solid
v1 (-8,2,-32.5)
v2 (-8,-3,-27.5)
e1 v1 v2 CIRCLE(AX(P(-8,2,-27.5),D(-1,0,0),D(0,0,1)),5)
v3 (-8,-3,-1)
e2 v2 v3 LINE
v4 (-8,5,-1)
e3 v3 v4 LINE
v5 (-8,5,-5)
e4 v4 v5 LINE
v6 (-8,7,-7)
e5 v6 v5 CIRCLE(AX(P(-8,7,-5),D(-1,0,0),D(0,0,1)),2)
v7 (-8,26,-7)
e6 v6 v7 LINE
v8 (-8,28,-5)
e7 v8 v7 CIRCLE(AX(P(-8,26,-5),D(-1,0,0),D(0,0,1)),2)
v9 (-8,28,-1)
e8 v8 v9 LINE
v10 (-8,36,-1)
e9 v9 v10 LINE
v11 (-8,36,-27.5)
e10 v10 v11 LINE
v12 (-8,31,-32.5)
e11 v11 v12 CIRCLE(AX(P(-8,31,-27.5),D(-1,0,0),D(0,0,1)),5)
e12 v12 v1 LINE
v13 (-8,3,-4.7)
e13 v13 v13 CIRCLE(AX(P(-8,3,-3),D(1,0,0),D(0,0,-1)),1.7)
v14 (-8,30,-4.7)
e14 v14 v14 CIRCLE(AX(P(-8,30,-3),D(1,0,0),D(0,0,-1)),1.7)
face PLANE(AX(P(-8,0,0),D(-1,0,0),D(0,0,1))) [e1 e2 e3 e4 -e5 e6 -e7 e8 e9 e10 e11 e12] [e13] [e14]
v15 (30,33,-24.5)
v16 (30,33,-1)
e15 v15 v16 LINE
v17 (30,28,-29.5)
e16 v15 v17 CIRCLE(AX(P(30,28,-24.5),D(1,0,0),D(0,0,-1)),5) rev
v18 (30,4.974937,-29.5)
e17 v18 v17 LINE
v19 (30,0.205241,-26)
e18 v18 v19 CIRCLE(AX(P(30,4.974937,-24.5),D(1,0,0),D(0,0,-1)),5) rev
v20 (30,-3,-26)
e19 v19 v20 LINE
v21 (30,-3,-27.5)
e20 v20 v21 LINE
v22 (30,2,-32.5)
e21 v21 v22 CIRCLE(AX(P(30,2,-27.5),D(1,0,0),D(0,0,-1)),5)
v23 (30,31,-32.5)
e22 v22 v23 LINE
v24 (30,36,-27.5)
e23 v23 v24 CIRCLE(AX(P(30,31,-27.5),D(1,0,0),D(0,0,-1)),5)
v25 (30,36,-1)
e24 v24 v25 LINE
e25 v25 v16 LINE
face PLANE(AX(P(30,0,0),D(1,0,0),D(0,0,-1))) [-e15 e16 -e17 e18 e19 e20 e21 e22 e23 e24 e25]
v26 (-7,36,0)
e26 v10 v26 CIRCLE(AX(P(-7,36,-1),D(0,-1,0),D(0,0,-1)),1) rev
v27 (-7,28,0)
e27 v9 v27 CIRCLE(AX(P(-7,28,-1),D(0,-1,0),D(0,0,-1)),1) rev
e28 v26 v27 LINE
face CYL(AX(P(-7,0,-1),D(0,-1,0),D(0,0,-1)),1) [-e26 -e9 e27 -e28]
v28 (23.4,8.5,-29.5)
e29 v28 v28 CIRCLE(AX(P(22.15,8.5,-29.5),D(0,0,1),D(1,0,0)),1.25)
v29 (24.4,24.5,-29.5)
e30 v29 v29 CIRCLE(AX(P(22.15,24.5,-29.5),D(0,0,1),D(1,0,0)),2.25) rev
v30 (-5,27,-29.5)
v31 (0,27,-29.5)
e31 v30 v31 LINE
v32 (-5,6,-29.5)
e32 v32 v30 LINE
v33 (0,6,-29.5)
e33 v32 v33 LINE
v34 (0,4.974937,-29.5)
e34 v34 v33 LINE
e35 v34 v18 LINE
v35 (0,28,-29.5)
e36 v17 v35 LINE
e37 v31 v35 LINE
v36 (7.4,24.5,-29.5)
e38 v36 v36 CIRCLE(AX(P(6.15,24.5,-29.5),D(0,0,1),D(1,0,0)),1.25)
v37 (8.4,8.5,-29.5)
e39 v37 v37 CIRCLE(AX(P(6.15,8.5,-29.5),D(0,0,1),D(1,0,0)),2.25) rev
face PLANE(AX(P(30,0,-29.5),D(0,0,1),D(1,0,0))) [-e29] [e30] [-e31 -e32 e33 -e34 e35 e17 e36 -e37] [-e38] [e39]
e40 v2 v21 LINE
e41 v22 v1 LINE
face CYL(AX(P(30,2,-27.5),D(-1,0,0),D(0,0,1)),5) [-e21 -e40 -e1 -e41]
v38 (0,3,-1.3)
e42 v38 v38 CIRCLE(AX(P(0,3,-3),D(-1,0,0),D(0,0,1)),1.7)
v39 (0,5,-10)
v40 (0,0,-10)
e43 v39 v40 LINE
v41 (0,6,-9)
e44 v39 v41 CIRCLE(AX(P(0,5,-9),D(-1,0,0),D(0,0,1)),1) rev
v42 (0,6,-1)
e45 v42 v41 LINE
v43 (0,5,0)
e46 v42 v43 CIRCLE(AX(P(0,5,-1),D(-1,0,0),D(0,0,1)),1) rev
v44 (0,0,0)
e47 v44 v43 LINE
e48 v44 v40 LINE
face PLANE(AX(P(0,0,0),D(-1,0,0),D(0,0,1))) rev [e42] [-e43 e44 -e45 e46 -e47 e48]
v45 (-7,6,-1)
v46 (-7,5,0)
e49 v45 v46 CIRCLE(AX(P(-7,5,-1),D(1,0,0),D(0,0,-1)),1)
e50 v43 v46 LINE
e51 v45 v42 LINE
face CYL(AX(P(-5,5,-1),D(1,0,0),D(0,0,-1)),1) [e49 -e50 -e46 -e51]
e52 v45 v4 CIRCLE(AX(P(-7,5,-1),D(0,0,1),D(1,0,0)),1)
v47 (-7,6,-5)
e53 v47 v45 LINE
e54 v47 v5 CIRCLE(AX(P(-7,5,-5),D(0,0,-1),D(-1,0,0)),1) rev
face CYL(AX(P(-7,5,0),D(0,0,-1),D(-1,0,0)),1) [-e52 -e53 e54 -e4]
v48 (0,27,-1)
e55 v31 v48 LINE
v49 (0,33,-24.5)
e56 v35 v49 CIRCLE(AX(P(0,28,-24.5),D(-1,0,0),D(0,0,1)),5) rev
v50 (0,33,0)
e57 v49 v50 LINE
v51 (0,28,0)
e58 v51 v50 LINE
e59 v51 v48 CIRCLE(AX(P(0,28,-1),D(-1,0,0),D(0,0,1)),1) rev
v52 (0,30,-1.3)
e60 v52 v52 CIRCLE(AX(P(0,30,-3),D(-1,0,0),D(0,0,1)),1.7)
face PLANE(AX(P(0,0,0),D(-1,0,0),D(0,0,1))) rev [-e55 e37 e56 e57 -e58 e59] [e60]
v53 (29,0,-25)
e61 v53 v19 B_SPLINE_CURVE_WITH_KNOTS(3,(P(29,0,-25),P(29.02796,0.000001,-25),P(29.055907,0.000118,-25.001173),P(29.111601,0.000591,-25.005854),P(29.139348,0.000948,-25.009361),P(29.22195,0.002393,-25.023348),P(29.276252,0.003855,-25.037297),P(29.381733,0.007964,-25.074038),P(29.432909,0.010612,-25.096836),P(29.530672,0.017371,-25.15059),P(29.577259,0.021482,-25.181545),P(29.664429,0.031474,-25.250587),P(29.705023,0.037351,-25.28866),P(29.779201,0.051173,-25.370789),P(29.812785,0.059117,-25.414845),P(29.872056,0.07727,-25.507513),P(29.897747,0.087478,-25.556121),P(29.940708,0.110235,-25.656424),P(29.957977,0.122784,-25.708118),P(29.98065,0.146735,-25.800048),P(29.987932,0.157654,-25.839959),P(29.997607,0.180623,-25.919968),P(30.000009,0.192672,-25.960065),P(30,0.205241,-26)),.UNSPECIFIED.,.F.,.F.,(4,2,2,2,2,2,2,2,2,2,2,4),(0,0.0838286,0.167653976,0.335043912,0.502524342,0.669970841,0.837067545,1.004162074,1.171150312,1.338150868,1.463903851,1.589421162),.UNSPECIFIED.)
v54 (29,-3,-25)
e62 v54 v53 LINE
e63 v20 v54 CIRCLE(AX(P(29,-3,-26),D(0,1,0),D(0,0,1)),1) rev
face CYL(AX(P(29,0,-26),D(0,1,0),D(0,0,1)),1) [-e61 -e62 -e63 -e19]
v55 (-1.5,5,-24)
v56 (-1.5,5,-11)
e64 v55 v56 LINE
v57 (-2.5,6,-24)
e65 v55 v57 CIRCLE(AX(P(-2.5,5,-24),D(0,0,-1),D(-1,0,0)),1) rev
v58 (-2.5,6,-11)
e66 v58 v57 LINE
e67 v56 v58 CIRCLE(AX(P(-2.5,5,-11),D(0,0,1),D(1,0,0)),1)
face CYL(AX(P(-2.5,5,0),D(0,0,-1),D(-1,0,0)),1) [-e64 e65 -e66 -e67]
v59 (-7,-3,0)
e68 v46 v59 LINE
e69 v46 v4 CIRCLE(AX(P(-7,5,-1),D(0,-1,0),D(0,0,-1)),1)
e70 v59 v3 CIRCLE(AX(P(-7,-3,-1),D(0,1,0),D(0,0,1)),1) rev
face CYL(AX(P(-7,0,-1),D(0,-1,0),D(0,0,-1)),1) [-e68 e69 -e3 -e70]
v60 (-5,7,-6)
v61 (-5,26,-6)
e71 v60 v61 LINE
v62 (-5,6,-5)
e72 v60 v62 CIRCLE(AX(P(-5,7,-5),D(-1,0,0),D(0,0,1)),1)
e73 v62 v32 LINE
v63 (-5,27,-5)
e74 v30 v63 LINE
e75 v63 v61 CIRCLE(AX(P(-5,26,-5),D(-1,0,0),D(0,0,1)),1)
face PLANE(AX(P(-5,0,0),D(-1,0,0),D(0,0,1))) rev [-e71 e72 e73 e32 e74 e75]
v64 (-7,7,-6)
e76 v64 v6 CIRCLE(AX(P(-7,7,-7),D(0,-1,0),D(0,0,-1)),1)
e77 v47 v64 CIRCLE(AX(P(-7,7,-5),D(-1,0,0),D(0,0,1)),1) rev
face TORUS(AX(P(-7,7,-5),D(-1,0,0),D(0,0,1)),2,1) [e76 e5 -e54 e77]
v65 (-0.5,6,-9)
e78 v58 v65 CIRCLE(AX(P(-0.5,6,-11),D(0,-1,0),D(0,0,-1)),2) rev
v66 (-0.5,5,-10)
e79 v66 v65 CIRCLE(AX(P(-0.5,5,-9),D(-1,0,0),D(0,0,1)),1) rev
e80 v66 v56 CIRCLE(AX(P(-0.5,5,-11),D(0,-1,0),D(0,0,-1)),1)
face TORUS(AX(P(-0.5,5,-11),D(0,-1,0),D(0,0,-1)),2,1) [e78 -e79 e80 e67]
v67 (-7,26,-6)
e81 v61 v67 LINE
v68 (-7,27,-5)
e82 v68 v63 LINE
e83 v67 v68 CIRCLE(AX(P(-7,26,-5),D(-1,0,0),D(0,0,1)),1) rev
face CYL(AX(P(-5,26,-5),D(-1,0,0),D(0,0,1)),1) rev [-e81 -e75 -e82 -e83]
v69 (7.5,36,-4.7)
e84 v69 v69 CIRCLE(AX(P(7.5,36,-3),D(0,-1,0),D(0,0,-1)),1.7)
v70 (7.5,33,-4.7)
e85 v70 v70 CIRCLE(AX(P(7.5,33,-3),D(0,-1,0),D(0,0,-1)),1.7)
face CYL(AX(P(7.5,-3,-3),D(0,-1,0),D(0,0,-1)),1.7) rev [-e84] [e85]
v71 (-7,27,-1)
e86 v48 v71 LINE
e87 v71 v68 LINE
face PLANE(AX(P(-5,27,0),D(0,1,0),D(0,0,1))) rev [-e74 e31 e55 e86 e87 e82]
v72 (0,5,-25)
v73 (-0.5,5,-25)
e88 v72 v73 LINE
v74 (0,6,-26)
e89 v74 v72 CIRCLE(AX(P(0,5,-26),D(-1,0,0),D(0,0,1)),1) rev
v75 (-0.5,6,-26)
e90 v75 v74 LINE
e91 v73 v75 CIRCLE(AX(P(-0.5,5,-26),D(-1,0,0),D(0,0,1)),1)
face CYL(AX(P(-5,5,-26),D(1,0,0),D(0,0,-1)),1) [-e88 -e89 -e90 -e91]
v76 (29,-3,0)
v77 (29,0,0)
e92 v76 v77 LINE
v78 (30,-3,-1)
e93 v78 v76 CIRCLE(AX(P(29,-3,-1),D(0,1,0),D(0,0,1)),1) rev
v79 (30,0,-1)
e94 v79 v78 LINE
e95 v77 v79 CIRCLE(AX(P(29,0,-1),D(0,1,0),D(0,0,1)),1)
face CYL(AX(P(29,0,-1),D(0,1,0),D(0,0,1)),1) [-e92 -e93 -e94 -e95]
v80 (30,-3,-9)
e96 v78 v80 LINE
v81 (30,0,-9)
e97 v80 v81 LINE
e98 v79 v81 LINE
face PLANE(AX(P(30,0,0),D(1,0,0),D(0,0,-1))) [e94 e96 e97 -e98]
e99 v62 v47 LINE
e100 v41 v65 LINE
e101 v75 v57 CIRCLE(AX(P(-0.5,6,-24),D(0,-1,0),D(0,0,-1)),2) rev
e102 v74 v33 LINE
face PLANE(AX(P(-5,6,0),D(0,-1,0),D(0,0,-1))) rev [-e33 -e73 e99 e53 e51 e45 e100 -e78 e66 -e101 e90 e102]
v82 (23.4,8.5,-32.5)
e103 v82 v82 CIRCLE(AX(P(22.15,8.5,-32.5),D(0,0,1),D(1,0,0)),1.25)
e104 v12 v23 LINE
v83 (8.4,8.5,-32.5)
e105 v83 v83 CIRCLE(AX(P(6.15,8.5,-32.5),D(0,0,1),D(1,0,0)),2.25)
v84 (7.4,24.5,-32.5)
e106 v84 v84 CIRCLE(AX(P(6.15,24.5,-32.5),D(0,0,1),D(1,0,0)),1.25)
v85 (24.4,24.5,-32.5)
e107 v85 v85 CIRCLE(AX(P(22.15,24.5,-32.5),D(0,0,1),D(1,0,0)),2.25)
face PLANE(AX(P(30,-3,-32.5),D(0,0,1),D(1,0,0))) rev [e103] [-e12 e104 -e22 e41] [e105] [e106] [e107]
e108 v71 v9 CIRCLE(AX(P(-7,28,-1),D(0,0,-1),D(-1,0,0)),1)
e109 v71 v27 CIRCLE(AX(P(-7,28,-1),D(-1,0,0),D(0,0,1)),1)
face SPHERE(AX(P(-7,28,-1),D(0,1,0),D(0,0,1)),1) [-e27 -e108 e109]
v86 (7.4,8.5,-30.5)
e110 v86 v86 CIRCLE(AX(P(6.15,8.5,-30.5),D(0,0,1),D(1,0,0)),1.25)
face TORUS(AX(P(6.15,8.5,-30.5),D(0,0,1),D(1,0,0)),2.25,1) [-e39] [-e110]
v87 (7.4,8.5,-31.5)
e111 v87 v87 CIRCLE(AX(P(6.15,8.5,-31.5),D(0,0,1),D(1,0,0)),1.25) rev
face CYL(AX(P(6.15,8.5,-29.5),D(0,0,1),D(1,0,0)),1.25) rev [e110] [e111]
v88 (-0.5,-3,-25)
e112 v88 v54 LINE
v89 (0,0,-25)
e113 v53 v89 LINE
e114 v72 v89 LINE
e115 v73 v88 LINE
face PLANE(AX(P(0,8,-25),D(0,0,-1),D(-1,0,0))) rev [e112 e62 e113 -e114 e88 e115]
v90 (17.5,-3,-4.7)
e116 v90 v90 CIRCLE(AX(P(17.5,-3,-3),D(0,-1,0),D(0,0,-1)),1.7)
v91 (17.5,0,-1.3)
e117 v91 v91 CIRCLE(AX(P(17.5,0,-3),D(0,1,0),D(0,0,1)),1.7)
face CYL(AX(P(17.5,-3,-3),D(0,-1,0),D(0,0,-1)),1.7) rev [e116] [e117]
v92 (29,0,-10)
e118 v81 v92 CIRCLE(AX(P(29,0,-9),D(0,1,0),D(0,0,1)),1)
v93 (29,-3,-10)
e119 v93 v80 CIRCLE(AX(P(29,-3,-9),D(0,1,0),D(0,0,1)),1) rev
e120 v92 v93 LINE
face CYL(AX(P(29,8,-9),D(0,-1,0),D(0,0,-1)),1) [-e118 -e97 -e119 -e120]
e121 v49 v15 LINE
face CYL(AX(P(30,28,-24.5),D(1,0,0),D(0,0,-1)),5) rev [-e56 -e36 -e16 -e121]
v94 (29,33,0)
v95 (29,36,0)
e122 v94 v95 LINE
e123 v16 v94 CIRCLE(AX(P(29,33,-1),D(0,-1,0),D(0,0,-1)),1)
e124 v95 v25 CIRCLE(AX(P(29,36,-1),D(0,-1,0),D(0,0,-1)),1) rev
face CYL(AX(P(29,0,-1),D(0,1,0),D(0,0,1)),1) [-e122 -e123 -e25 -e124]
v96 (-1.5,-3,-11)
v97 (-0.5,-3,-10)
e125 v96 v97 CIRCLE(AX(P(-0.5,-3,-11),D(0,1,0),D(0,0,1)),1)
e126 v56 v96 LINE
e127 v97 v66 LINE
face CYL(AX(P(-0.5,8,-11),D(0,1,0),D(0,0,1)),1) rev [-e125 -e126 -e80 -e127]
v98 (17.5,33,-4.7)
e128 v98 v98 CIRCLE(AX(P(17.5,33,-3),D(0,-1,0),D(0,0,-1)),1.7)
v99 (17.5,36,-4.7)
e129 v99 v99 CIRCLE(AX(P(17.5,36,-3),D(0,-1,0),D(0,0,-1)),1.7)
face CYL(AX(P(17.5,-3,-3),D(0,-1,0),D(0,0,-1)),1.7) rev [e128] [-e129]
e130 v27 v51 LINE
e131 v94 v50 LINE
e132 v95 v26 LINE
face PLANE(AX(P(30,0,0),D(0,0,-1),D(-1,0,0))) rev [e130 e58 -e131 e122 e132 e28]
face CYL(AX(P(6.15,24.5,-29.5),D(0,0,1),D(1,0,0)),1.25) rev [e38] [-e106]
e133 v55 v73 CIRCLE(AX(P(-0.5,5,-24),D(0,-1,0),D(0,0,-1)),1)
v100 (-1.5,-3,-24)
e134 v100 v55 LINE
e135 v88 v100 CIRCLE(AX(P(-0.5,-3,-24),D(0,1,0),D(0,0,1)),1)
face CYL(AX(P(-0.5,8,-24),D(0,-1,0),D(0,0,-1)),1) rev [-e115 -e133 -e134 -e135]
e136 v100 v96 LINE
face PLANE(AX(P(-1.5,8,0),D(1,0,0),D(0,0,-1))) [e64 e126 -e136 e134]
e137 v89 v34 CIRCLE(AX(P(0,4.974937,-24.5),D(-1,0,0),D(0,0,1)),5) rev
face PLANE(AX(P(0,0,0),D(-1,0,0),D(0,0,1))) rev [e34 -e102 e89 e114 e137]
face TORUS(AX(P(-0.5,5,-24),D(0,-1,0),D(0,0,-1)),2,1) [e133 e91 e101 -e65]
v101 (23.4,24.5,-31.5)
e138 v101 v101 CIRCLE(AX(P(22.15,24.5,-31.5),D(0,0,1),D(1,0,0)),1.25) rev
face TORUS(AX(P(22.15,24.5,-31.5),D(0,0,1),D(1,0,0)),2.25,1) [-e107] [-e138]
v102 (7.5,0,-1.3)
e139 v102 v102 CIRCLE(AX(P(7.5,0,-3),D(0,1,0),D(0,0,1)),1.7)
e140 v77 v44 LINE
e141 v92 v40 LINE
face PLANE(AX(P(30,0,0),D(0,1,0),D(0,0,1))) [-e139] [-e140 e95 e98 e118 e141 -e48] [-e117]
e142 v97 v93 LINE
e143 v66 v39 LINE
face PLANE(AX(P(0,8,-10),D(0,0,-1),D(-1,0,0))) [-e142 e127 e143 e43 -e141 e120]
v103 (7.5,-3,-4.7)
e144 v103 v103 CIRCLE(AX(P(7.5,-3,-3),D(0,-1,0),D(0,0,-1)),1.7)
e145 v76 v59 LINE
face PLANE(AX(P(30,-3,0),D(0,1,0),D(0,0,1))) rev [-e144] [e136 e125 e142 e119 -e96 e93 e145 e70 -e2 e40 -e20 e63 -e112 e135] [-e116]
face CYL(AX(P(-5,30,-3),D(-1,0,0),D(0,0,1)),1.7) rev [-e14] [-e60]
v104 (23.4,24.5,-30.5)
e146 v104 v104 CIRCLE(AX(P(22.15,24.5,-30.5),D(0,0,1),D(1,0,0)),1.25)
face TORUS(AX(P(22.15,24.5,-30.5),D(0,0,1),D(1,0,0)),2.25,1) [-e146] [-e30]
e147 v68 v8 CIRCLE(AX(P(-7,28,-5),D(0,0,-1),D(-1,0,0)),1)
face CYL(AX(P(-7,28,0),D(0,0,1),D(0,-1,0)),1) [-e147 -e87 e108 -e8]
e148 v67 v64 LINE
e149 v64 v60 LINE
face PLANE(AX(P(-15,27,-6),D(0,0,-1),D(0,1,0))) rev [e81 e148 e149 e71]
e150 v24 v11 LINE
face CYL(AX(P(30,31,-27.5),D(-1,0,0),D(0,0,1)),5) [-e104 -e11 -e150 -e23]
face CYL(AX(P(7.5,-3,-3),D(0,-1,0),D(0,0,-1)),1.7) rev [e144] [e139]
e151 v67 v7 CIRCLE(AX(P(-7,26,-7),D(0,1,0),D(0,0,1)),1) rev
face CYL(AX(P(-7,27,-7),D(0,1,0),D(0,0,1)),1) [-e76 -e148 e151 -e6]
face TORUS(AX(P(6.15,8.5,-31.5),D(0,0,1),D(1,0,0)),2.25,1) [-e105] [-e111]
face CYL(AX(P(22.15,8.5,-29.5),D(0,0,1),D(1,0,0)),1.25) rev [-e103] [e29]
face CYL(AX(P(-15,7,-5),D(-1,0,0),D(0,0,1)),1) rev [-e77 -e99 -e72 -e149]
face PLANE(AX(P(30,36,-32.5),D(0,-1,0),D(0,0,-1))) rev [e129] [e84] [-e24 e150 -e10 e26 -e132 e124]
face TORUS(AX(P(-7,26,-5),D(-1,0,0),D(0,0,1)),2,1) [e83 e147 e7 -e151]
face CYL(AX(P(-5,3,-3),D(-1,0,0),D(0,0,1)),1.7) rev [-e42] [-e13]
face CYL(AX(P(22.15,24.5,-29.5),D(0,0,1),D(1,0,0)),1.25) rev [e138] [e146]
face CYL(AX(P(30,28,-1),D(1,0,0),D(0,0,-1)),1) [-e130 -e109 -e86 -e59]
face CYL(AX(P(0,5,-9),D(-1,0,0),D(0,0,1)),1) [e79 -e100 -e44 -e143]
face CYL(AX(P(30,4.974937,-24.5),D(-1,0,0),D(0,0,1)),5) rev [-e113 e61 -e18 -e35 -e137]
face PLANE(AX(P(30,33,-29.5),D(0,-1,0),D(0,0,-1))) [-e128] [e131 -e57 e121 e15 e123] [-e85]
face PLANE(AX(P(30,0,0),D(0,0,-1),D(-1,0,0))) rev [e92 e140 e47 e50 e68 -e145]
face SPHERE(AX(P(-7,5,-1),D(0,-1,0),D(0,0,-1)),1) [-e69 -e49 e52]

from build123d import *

# Parameters (mm, degrees)
EXTRUDE_1_DEPTH     = 30
HOLE_WIZARD_M4_1_D  = 2.5
SKETCH_13_W         = 3
SKETCH_13_H         = 21
SKETCH_13_W_2       = 29.5
SKETCH_13_H_2       = 6
EXTRUDE_2_DEPTH     = 5
HOLE_WIZARD_M3_1_D  = 3.4
HOLE_WIZARD_M3_2_D  = 3.4
SKETCH_18_W         = 33
SKETCH_18_H         = 15
CUT_EXTRUDE_1_DEPTH = 11
SKETCH_20_W         = 32.5
SKETCH_20_H         = 39
EXTRUDE_3_DEPTH     = 3
FILLET_3_R          = 5
FILLET_4_R          = 5
FILLET_5_R          = 1
HOLE_WIZARD_M3_3_D  = 3.4
SKETCH_24_W         = 6
SKETCH_24_H         = 21
CUT_EXTRUDE_2_DEPTH = 10
FILLET_6_R          = 1
FILLET1_R           = 1


with BuildPart() as part:
    # 草图1 → 凸台-拉伸1 (new body)
    with BuildSketch(Plane(origin=(0, 0, 0), x_dir=(0, 0, -1), z_dir=(1, 0, 0))):
        Polygon((0, 0), (29.5, 0), (29.5, 33), (0, 33), (0, 36), (32.5, 36), (32.5, -3), (0, -3), align=None)
    extrude(amount=EXTRUDE_1_DEPTH)

    # M4 间隙孔1 (through all)
    with Locations(Plane.XY.offset(-29.5)):
        with Locations((6.15, 24.5), (22.15, 24.5), (6.15, 8.5), (22.15, 8.5)):
            Hole(HOLE_WIZARD_M4_1_D / 2)

    # 草图13 → 凸台-拉伸2 (add)
    with BuildSketch(Plane(origin=(0, 0, 0), x_dir=(0, 0, -1), z_dir=(1, 0, 0))):
        with Locations((31, 16.5)):
            Rectangle(SKETCH_13_W, SKETCH_13_H)
        with Locations((14.75, 3)):
            Rectangle(SKETCH_13_W_2, SKETCH_13_H_2)
        Polygon((0, 0), (0, -3), (32.5, -3), (32.5, 6), (29.5, 6), (29.5, 0), align=None)
        with Locations((14.75, 30)):
            Rectangle(SKETCH_13_W_2, SKETCH_13_H_2)
        Polygon((29.5, 27), (32.5, 27), (32.5, 36), (0, 36), (0, 33), (29.5, 33), align=None)
    extrude(amount=-EXTRUDE_2_DEPTH)

    # M3 间隙孔1 (through all)
    with Locations(Plane(origin=(0, -3, 0), x_dir=(-1, 0, 0), z_dir=(0, -1, 0))):
        with Locations((-7.5, 3), (-17.5, 3)):
            Hole(HOLE_WIZARD_M3_1_D / 2)

    # M3 间隙孔2 (through all)
    with Locations(Plane.ZY.offset(5)):
        with Locations((-3, 30), (-3, 3)):
            Hole(HOLE_WIZARD_M3_2_D / 2)

    # 草图18 → 切除-拉伸1 (cut)
    with BuildSketch(Plane.XZ.offset(3)):
        with Locations((15, -17.5)):
            Rectangle(SKETCH_18_W, SKETCH_18_H)
    extrude(amount=-CUT_EXTRUDE_1_DEPTH, mode=Mode.SUBTRACT)

    # 草图20 → 凸台-拉伸3 (add)
    with BuildSketch(Plane.ZY.offset(5)):
        with Locations((-16.25, 16.5)):
            Rectangle(SKETCH_20_W, SKETCH_20_H)
    extrude(amount=EXTRUDE_3_DEPTH)

    # 圆角3
    fillet_3_edges = [part.edges().sort_by_distance(p)[0] for p in [
        (11, -3, -32.5),
        (11, 36, -32.5),
    ]]
    fillet(fillet_3_edges, radius=FILLET_3_R)

    # 圆角4
    # the kernel refuses this fillet: 5 mm, written as the material it adds along each edge
    with BuildSketch(Plane(origin=(0, 33, -29.5), x_dir=(0, -1, 0), z_dir=(1, 0, 0))) as fillet_4_piece_1:
        with BuildLine():
            CenterArc((FILLET_4_R, -FILLET_4_R), FILLET_4_R, 90, 90)
            Line((0, -FILLET_4_R), (0, 0))
            Line((0, 0), (FILLET_4_R, 0))
        make_face()
    extrude(amount=30)
    with BuildSketch(Plane(origin=(0, 0, -29.5), x_dir=(0, 0, 1), z_dir=(1, 0, 0))) as fillet_4_piece_2:
        with BuildLine():
            CenterArc((5, -4.974937186), FILLET_4_R, 95.739170477, 84.260829523)
            Line((0, -4.974937186), (0, 0))
            Line((0, 0), (4.5, 0))
        make_face()
    extrude(amount=30)

    # 圆角5
    fillet_5_edges = [part.edges().sort_by_distance(p)[0] for p in [
        (-1.5, 6, -17.5),
        (-0.75, 6, -25),
        (-0.75, 6, -10),
        (-1.5, 1.5, -25),
        (-1.5, 1.5, -10),
        (30, 34.5, 0),
        (30, -1.5, -10),
        (30, -1.5, -25),
        (-8, 16.5, 0),
        (30, -1.5, 0),
    ]]
    fillet(fillet_5_edges, radius=FILLET_5_R)

    # M3 间隙孔3 (through all)
    with Locations(Plane(origin=(-5, 0, 0), x_dir=(0, 0, -1), z_dir=(1, 0, 0))):
        with Locations((3, 30), (3, 3)):
            Hole(HOLE_WIZARD_M3_3_D / 2)

    # 草图24 → 切除-拉伸2 (cut)
    with BuildSketch(Plane(origin=(-5, 0, 0), x_dir=(0, 0, -1), z_dir=(1, 0, 0))):
        with Locations((3, 16.5)):
            Rectangle(SKETCH_24_W, SKETCH_24_H)
    extrude(amount=-CUT_EXTRUDE_2_DEPTH, mode=Mode.SUBTRACT)

    # 圆角6
    fillet_6_edges = [part.edges().sort_by_distance(p)[0] for p in [
        (-7.707106781, 6, -0.292893219),
        (-7.707106781, 27, -0.292893219),
        (-8, 16.5, -6),
        (-8, 27, -3.5),
        (-8, 6, -3.5),
        (-6.5, 27, -6),
        (-6.5, 6, -6),
        (-3.5, 6, 0),
        (-3.5, 27, 0),
    ]]
    fillet(fillet_6_edges, radius=FILLET_6_R)

    # Fillet1
    fillet1_edges = [part.edges().sort_by_distance(p)[0] for p in [
        (7.4, 8.5, -29.5),
        (7.4, 8.5, -32.5),
        (23.4, 24.5, -29.5),
        (23.4, 24.5, -32.5),
    ]]
    fillet(fillet1_edges, radius=FILLET1_R)


solid = part.part
